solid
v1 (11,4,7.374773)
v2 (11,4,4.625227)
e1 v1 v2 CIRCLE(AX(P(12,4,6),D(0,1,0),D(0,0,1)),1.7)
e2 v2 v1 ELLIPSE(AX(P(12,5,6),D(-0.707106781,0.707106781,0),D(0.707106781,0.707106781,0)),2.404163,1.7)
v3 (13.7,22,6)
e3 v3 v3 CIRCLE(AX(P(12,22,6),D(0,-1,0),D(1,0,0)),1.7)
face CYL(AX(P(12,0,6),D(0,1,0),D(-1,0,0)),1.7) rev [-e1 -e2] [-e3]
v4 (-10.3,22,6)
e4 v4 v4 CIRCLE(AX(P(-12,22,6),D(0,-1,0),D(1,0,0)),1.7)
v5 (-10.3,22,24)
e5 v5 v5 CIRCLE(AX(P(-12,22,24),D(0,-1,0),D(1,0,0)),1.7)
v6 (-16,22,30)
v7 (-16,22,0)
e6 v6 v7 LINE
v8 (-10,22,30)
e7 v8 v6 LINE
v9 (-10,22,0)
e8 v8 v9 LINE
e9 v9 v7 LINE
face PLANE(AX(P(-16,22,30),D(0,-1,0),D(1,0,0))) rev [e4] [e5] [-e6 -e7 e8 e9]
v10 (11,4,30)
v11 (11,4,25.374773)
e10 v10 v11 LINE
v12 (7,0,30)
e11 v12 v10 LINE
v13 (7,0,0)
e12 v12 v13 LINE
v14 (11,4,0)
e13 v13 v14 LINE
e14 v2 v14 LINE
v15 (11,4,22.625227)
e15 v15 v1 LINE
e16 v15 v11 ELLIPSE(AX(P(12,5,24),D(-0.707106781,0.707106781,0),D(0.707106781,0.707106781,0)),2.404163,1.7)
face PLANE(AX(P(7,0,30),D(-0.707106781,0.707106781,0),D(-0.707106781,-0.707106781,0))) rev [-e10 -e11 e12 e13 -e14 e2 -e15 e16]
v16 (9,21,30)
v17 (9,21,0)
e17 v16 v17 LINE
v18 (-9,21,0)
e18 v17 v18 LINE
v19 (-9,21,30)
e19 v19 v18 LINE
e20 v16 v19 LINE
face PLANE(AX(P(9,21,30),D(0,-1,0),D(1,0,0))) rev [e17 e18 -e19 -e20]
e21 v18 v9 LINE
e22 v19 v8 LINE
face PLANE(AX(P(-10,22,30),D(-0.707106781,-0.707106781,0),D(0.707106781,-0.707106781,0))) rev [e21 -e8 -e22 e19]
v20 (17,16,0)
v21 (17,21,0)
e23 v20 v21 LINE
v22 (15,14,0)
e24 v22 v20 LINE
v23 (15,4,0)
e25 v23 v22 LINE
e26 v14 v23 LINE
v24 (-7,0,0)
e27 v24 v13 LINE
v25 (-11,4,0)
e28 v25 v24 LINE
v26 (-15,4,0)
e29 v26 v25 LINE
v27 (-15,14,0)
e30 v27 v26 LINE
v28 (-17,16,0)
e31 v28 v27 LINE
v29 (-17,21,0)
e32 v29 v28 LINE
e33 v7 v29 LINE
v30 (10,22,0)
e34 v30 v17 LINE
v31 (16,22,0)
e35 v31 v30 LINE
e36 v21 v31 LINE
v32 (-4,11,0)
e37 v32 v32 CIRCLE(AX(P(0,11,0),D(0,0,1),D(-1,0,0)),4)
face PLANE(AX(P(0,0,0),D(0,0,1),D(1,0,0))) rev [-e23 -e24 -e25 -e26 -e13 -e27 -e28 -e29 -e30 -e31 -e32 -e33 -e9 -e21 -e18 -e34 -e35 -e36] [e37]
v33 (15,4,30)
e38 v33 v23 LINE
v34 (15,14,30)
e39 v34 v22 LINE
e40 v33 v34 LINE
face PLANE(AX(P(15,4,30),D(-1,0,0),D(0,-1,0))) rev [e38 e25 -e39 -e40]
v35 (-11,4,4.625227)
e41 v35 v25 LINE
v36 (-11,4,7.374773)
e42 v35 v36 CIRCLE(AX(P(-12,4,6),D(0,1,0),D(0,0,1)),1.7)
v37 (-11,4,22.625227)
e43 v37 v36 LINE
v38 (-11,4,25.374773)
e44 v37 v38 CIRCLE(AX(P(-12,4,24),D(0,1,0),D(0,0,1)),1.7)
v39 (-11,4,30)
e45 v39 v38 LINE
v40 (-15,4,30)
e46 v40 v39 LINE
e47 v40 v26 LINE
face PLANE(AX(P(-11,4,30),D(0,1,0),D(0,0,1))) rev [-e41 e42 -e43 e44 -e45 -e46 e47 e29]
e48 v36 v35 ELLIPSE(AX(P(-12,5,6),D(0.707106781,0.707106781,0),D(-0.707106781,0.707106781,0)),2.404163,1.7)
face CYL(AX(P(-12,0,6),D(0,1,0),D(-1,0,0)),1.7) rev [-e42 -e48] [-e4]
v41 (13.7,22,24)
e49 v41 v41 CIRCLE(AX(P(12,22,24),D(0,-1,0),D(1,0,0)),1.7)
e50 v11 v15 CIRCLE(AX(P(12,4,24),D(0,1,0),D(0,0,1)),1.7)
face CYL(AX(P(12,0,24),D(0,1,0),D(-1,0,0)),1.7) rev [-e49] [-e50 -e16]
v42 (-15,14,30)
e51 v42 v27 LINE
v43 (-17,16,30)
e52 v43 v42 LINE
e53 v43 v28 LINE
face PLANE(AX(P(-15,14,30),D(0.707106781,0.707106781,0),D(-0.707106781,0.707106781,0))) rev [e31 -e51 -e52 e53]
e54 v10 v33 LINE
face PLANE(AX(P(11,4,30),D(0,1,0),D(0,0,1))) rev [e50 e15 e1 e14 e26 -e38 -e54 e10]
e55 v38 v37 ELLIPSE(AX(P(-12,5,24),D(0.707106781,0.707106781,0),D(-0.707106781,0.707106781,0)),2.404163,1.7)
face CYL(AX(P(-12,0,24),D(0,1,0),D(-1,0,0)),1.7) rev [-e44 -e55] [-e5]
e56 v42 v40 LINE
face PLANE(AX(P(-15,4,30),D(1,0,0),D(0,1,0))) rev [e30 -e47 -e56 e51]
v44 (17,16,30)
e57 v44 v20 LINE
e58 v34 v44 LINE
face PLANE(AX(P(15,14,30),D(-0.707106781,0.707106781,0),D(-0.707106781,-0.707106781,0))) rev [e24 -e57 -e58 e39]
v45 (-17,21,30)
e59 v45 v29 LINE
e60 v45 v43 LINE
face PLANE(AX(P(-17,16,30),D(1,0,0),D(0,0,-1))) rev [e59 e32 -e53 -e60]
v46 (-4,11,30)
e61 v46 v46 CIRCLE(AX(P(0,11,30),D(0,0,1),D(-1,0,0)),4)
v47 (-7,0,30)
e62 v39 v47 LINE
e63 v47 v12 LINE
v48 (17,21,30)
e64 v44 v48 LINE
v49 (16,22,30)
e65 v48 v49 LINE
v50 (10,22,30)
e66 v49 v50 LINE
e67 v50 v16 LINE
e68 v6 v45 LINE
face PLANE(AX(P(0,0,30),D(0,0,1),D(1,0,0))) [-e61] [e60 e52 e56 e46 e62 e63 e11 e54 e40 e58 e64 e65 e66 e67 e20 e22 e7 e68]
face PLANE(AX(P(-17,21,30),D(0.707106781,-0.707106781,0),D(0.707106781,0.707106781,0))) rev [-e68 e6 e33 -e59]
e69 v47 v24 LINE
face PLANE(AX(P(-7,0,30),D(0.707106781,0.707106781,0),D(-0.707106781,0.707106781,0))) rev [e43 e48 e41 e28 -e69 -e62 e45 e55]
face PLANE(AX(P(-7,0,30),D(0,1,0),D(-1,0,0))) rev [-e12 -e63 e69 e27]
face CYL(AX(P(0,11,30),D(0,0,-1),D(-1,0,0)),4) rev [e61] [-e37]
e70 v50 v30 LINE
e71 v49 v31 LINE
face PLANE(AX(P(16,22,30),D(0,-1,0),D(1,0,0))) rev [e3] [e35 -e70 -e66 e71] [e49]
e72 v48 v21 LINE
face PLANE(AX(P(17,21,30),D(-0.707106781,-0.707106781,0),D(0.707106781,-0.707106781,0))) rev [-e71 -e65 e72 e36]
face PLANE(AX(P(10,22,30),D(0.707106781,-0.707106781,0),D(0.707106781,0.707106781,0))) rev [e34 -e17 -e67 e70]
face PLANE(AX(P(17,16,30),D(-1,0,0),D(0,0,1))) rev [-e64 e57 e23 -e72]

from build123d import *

# Parameters (mm, degrees)
BOSS_EXTRUDE1_OUTLINE_R = 4
BOSS_EXTRUDE1_DEPTH     = 30
CUT_EXTRUDE1_DEPTH      = 41.902322672
CUT_EXTRUDE1_DEPTH_BACK = 41.902322672
SKETCH2_R               = 1.7


# Read off the part's stored shape, not the designer's step: Boss-Extrude1
with BuildPart() as part:
    # Boss-Extrude1 outline → Boss-Extrude1 (new body)
    with BuildSketch(Plane.XY):
        Polygon((7, 0), (11, 4), (15, 4), (15, 14), (17, 16), (17, 21), (16, 22), (10, 22), (9, 21), (-9, 21), (-10, 22), (-16, 22), (-17, 21), (-17, 16), (-15, 14), (-15, 4), (-11, 4), (-7, 0), align=None)
        with Locations((0, 11)):
            Circle(BOSS_EXTRUDE1_OUTLINE_R, mode=Mode.SUBTRACT)
    extrude(amount=BOSS_EXTRUDE1_DEPTH)

    # Sketch2 → Cut-Extrude1 (cut, two sides: drawn at the far end of the back side and taken through both)
    with BuildSketch(Plane(origin=(0, 22, 0), x_dir=(1, 0, 0), z_dir=(0, 1, 0)).offset(-CUT_EXTRUDE1_DEPTH_BACK)):
        with Locations(Location((12, -6, 0), (0, 0, 233.968120928))):
            Circle(SKETCH2_R)
        with Locations(Location((-12, -6, 0), (0, 0, 53.968120928))):
            Circle(SKETCH2_R)
        with Locations(Location((12, -24, 0), (0, 0, 126.031879072))):
            Circle(SKETCH2_R)
        with Locations(Location((-12, -24, 0), (0, 0, 306.031879072))):
            Circle(SKETCH2_R)
    extrude(amount=CUT_EXTRUDE1_DEPTH + CUT_EXTRUDE1_DEPTH_BACK, mode=Mode.SUBTRACT)


solid = part.part
